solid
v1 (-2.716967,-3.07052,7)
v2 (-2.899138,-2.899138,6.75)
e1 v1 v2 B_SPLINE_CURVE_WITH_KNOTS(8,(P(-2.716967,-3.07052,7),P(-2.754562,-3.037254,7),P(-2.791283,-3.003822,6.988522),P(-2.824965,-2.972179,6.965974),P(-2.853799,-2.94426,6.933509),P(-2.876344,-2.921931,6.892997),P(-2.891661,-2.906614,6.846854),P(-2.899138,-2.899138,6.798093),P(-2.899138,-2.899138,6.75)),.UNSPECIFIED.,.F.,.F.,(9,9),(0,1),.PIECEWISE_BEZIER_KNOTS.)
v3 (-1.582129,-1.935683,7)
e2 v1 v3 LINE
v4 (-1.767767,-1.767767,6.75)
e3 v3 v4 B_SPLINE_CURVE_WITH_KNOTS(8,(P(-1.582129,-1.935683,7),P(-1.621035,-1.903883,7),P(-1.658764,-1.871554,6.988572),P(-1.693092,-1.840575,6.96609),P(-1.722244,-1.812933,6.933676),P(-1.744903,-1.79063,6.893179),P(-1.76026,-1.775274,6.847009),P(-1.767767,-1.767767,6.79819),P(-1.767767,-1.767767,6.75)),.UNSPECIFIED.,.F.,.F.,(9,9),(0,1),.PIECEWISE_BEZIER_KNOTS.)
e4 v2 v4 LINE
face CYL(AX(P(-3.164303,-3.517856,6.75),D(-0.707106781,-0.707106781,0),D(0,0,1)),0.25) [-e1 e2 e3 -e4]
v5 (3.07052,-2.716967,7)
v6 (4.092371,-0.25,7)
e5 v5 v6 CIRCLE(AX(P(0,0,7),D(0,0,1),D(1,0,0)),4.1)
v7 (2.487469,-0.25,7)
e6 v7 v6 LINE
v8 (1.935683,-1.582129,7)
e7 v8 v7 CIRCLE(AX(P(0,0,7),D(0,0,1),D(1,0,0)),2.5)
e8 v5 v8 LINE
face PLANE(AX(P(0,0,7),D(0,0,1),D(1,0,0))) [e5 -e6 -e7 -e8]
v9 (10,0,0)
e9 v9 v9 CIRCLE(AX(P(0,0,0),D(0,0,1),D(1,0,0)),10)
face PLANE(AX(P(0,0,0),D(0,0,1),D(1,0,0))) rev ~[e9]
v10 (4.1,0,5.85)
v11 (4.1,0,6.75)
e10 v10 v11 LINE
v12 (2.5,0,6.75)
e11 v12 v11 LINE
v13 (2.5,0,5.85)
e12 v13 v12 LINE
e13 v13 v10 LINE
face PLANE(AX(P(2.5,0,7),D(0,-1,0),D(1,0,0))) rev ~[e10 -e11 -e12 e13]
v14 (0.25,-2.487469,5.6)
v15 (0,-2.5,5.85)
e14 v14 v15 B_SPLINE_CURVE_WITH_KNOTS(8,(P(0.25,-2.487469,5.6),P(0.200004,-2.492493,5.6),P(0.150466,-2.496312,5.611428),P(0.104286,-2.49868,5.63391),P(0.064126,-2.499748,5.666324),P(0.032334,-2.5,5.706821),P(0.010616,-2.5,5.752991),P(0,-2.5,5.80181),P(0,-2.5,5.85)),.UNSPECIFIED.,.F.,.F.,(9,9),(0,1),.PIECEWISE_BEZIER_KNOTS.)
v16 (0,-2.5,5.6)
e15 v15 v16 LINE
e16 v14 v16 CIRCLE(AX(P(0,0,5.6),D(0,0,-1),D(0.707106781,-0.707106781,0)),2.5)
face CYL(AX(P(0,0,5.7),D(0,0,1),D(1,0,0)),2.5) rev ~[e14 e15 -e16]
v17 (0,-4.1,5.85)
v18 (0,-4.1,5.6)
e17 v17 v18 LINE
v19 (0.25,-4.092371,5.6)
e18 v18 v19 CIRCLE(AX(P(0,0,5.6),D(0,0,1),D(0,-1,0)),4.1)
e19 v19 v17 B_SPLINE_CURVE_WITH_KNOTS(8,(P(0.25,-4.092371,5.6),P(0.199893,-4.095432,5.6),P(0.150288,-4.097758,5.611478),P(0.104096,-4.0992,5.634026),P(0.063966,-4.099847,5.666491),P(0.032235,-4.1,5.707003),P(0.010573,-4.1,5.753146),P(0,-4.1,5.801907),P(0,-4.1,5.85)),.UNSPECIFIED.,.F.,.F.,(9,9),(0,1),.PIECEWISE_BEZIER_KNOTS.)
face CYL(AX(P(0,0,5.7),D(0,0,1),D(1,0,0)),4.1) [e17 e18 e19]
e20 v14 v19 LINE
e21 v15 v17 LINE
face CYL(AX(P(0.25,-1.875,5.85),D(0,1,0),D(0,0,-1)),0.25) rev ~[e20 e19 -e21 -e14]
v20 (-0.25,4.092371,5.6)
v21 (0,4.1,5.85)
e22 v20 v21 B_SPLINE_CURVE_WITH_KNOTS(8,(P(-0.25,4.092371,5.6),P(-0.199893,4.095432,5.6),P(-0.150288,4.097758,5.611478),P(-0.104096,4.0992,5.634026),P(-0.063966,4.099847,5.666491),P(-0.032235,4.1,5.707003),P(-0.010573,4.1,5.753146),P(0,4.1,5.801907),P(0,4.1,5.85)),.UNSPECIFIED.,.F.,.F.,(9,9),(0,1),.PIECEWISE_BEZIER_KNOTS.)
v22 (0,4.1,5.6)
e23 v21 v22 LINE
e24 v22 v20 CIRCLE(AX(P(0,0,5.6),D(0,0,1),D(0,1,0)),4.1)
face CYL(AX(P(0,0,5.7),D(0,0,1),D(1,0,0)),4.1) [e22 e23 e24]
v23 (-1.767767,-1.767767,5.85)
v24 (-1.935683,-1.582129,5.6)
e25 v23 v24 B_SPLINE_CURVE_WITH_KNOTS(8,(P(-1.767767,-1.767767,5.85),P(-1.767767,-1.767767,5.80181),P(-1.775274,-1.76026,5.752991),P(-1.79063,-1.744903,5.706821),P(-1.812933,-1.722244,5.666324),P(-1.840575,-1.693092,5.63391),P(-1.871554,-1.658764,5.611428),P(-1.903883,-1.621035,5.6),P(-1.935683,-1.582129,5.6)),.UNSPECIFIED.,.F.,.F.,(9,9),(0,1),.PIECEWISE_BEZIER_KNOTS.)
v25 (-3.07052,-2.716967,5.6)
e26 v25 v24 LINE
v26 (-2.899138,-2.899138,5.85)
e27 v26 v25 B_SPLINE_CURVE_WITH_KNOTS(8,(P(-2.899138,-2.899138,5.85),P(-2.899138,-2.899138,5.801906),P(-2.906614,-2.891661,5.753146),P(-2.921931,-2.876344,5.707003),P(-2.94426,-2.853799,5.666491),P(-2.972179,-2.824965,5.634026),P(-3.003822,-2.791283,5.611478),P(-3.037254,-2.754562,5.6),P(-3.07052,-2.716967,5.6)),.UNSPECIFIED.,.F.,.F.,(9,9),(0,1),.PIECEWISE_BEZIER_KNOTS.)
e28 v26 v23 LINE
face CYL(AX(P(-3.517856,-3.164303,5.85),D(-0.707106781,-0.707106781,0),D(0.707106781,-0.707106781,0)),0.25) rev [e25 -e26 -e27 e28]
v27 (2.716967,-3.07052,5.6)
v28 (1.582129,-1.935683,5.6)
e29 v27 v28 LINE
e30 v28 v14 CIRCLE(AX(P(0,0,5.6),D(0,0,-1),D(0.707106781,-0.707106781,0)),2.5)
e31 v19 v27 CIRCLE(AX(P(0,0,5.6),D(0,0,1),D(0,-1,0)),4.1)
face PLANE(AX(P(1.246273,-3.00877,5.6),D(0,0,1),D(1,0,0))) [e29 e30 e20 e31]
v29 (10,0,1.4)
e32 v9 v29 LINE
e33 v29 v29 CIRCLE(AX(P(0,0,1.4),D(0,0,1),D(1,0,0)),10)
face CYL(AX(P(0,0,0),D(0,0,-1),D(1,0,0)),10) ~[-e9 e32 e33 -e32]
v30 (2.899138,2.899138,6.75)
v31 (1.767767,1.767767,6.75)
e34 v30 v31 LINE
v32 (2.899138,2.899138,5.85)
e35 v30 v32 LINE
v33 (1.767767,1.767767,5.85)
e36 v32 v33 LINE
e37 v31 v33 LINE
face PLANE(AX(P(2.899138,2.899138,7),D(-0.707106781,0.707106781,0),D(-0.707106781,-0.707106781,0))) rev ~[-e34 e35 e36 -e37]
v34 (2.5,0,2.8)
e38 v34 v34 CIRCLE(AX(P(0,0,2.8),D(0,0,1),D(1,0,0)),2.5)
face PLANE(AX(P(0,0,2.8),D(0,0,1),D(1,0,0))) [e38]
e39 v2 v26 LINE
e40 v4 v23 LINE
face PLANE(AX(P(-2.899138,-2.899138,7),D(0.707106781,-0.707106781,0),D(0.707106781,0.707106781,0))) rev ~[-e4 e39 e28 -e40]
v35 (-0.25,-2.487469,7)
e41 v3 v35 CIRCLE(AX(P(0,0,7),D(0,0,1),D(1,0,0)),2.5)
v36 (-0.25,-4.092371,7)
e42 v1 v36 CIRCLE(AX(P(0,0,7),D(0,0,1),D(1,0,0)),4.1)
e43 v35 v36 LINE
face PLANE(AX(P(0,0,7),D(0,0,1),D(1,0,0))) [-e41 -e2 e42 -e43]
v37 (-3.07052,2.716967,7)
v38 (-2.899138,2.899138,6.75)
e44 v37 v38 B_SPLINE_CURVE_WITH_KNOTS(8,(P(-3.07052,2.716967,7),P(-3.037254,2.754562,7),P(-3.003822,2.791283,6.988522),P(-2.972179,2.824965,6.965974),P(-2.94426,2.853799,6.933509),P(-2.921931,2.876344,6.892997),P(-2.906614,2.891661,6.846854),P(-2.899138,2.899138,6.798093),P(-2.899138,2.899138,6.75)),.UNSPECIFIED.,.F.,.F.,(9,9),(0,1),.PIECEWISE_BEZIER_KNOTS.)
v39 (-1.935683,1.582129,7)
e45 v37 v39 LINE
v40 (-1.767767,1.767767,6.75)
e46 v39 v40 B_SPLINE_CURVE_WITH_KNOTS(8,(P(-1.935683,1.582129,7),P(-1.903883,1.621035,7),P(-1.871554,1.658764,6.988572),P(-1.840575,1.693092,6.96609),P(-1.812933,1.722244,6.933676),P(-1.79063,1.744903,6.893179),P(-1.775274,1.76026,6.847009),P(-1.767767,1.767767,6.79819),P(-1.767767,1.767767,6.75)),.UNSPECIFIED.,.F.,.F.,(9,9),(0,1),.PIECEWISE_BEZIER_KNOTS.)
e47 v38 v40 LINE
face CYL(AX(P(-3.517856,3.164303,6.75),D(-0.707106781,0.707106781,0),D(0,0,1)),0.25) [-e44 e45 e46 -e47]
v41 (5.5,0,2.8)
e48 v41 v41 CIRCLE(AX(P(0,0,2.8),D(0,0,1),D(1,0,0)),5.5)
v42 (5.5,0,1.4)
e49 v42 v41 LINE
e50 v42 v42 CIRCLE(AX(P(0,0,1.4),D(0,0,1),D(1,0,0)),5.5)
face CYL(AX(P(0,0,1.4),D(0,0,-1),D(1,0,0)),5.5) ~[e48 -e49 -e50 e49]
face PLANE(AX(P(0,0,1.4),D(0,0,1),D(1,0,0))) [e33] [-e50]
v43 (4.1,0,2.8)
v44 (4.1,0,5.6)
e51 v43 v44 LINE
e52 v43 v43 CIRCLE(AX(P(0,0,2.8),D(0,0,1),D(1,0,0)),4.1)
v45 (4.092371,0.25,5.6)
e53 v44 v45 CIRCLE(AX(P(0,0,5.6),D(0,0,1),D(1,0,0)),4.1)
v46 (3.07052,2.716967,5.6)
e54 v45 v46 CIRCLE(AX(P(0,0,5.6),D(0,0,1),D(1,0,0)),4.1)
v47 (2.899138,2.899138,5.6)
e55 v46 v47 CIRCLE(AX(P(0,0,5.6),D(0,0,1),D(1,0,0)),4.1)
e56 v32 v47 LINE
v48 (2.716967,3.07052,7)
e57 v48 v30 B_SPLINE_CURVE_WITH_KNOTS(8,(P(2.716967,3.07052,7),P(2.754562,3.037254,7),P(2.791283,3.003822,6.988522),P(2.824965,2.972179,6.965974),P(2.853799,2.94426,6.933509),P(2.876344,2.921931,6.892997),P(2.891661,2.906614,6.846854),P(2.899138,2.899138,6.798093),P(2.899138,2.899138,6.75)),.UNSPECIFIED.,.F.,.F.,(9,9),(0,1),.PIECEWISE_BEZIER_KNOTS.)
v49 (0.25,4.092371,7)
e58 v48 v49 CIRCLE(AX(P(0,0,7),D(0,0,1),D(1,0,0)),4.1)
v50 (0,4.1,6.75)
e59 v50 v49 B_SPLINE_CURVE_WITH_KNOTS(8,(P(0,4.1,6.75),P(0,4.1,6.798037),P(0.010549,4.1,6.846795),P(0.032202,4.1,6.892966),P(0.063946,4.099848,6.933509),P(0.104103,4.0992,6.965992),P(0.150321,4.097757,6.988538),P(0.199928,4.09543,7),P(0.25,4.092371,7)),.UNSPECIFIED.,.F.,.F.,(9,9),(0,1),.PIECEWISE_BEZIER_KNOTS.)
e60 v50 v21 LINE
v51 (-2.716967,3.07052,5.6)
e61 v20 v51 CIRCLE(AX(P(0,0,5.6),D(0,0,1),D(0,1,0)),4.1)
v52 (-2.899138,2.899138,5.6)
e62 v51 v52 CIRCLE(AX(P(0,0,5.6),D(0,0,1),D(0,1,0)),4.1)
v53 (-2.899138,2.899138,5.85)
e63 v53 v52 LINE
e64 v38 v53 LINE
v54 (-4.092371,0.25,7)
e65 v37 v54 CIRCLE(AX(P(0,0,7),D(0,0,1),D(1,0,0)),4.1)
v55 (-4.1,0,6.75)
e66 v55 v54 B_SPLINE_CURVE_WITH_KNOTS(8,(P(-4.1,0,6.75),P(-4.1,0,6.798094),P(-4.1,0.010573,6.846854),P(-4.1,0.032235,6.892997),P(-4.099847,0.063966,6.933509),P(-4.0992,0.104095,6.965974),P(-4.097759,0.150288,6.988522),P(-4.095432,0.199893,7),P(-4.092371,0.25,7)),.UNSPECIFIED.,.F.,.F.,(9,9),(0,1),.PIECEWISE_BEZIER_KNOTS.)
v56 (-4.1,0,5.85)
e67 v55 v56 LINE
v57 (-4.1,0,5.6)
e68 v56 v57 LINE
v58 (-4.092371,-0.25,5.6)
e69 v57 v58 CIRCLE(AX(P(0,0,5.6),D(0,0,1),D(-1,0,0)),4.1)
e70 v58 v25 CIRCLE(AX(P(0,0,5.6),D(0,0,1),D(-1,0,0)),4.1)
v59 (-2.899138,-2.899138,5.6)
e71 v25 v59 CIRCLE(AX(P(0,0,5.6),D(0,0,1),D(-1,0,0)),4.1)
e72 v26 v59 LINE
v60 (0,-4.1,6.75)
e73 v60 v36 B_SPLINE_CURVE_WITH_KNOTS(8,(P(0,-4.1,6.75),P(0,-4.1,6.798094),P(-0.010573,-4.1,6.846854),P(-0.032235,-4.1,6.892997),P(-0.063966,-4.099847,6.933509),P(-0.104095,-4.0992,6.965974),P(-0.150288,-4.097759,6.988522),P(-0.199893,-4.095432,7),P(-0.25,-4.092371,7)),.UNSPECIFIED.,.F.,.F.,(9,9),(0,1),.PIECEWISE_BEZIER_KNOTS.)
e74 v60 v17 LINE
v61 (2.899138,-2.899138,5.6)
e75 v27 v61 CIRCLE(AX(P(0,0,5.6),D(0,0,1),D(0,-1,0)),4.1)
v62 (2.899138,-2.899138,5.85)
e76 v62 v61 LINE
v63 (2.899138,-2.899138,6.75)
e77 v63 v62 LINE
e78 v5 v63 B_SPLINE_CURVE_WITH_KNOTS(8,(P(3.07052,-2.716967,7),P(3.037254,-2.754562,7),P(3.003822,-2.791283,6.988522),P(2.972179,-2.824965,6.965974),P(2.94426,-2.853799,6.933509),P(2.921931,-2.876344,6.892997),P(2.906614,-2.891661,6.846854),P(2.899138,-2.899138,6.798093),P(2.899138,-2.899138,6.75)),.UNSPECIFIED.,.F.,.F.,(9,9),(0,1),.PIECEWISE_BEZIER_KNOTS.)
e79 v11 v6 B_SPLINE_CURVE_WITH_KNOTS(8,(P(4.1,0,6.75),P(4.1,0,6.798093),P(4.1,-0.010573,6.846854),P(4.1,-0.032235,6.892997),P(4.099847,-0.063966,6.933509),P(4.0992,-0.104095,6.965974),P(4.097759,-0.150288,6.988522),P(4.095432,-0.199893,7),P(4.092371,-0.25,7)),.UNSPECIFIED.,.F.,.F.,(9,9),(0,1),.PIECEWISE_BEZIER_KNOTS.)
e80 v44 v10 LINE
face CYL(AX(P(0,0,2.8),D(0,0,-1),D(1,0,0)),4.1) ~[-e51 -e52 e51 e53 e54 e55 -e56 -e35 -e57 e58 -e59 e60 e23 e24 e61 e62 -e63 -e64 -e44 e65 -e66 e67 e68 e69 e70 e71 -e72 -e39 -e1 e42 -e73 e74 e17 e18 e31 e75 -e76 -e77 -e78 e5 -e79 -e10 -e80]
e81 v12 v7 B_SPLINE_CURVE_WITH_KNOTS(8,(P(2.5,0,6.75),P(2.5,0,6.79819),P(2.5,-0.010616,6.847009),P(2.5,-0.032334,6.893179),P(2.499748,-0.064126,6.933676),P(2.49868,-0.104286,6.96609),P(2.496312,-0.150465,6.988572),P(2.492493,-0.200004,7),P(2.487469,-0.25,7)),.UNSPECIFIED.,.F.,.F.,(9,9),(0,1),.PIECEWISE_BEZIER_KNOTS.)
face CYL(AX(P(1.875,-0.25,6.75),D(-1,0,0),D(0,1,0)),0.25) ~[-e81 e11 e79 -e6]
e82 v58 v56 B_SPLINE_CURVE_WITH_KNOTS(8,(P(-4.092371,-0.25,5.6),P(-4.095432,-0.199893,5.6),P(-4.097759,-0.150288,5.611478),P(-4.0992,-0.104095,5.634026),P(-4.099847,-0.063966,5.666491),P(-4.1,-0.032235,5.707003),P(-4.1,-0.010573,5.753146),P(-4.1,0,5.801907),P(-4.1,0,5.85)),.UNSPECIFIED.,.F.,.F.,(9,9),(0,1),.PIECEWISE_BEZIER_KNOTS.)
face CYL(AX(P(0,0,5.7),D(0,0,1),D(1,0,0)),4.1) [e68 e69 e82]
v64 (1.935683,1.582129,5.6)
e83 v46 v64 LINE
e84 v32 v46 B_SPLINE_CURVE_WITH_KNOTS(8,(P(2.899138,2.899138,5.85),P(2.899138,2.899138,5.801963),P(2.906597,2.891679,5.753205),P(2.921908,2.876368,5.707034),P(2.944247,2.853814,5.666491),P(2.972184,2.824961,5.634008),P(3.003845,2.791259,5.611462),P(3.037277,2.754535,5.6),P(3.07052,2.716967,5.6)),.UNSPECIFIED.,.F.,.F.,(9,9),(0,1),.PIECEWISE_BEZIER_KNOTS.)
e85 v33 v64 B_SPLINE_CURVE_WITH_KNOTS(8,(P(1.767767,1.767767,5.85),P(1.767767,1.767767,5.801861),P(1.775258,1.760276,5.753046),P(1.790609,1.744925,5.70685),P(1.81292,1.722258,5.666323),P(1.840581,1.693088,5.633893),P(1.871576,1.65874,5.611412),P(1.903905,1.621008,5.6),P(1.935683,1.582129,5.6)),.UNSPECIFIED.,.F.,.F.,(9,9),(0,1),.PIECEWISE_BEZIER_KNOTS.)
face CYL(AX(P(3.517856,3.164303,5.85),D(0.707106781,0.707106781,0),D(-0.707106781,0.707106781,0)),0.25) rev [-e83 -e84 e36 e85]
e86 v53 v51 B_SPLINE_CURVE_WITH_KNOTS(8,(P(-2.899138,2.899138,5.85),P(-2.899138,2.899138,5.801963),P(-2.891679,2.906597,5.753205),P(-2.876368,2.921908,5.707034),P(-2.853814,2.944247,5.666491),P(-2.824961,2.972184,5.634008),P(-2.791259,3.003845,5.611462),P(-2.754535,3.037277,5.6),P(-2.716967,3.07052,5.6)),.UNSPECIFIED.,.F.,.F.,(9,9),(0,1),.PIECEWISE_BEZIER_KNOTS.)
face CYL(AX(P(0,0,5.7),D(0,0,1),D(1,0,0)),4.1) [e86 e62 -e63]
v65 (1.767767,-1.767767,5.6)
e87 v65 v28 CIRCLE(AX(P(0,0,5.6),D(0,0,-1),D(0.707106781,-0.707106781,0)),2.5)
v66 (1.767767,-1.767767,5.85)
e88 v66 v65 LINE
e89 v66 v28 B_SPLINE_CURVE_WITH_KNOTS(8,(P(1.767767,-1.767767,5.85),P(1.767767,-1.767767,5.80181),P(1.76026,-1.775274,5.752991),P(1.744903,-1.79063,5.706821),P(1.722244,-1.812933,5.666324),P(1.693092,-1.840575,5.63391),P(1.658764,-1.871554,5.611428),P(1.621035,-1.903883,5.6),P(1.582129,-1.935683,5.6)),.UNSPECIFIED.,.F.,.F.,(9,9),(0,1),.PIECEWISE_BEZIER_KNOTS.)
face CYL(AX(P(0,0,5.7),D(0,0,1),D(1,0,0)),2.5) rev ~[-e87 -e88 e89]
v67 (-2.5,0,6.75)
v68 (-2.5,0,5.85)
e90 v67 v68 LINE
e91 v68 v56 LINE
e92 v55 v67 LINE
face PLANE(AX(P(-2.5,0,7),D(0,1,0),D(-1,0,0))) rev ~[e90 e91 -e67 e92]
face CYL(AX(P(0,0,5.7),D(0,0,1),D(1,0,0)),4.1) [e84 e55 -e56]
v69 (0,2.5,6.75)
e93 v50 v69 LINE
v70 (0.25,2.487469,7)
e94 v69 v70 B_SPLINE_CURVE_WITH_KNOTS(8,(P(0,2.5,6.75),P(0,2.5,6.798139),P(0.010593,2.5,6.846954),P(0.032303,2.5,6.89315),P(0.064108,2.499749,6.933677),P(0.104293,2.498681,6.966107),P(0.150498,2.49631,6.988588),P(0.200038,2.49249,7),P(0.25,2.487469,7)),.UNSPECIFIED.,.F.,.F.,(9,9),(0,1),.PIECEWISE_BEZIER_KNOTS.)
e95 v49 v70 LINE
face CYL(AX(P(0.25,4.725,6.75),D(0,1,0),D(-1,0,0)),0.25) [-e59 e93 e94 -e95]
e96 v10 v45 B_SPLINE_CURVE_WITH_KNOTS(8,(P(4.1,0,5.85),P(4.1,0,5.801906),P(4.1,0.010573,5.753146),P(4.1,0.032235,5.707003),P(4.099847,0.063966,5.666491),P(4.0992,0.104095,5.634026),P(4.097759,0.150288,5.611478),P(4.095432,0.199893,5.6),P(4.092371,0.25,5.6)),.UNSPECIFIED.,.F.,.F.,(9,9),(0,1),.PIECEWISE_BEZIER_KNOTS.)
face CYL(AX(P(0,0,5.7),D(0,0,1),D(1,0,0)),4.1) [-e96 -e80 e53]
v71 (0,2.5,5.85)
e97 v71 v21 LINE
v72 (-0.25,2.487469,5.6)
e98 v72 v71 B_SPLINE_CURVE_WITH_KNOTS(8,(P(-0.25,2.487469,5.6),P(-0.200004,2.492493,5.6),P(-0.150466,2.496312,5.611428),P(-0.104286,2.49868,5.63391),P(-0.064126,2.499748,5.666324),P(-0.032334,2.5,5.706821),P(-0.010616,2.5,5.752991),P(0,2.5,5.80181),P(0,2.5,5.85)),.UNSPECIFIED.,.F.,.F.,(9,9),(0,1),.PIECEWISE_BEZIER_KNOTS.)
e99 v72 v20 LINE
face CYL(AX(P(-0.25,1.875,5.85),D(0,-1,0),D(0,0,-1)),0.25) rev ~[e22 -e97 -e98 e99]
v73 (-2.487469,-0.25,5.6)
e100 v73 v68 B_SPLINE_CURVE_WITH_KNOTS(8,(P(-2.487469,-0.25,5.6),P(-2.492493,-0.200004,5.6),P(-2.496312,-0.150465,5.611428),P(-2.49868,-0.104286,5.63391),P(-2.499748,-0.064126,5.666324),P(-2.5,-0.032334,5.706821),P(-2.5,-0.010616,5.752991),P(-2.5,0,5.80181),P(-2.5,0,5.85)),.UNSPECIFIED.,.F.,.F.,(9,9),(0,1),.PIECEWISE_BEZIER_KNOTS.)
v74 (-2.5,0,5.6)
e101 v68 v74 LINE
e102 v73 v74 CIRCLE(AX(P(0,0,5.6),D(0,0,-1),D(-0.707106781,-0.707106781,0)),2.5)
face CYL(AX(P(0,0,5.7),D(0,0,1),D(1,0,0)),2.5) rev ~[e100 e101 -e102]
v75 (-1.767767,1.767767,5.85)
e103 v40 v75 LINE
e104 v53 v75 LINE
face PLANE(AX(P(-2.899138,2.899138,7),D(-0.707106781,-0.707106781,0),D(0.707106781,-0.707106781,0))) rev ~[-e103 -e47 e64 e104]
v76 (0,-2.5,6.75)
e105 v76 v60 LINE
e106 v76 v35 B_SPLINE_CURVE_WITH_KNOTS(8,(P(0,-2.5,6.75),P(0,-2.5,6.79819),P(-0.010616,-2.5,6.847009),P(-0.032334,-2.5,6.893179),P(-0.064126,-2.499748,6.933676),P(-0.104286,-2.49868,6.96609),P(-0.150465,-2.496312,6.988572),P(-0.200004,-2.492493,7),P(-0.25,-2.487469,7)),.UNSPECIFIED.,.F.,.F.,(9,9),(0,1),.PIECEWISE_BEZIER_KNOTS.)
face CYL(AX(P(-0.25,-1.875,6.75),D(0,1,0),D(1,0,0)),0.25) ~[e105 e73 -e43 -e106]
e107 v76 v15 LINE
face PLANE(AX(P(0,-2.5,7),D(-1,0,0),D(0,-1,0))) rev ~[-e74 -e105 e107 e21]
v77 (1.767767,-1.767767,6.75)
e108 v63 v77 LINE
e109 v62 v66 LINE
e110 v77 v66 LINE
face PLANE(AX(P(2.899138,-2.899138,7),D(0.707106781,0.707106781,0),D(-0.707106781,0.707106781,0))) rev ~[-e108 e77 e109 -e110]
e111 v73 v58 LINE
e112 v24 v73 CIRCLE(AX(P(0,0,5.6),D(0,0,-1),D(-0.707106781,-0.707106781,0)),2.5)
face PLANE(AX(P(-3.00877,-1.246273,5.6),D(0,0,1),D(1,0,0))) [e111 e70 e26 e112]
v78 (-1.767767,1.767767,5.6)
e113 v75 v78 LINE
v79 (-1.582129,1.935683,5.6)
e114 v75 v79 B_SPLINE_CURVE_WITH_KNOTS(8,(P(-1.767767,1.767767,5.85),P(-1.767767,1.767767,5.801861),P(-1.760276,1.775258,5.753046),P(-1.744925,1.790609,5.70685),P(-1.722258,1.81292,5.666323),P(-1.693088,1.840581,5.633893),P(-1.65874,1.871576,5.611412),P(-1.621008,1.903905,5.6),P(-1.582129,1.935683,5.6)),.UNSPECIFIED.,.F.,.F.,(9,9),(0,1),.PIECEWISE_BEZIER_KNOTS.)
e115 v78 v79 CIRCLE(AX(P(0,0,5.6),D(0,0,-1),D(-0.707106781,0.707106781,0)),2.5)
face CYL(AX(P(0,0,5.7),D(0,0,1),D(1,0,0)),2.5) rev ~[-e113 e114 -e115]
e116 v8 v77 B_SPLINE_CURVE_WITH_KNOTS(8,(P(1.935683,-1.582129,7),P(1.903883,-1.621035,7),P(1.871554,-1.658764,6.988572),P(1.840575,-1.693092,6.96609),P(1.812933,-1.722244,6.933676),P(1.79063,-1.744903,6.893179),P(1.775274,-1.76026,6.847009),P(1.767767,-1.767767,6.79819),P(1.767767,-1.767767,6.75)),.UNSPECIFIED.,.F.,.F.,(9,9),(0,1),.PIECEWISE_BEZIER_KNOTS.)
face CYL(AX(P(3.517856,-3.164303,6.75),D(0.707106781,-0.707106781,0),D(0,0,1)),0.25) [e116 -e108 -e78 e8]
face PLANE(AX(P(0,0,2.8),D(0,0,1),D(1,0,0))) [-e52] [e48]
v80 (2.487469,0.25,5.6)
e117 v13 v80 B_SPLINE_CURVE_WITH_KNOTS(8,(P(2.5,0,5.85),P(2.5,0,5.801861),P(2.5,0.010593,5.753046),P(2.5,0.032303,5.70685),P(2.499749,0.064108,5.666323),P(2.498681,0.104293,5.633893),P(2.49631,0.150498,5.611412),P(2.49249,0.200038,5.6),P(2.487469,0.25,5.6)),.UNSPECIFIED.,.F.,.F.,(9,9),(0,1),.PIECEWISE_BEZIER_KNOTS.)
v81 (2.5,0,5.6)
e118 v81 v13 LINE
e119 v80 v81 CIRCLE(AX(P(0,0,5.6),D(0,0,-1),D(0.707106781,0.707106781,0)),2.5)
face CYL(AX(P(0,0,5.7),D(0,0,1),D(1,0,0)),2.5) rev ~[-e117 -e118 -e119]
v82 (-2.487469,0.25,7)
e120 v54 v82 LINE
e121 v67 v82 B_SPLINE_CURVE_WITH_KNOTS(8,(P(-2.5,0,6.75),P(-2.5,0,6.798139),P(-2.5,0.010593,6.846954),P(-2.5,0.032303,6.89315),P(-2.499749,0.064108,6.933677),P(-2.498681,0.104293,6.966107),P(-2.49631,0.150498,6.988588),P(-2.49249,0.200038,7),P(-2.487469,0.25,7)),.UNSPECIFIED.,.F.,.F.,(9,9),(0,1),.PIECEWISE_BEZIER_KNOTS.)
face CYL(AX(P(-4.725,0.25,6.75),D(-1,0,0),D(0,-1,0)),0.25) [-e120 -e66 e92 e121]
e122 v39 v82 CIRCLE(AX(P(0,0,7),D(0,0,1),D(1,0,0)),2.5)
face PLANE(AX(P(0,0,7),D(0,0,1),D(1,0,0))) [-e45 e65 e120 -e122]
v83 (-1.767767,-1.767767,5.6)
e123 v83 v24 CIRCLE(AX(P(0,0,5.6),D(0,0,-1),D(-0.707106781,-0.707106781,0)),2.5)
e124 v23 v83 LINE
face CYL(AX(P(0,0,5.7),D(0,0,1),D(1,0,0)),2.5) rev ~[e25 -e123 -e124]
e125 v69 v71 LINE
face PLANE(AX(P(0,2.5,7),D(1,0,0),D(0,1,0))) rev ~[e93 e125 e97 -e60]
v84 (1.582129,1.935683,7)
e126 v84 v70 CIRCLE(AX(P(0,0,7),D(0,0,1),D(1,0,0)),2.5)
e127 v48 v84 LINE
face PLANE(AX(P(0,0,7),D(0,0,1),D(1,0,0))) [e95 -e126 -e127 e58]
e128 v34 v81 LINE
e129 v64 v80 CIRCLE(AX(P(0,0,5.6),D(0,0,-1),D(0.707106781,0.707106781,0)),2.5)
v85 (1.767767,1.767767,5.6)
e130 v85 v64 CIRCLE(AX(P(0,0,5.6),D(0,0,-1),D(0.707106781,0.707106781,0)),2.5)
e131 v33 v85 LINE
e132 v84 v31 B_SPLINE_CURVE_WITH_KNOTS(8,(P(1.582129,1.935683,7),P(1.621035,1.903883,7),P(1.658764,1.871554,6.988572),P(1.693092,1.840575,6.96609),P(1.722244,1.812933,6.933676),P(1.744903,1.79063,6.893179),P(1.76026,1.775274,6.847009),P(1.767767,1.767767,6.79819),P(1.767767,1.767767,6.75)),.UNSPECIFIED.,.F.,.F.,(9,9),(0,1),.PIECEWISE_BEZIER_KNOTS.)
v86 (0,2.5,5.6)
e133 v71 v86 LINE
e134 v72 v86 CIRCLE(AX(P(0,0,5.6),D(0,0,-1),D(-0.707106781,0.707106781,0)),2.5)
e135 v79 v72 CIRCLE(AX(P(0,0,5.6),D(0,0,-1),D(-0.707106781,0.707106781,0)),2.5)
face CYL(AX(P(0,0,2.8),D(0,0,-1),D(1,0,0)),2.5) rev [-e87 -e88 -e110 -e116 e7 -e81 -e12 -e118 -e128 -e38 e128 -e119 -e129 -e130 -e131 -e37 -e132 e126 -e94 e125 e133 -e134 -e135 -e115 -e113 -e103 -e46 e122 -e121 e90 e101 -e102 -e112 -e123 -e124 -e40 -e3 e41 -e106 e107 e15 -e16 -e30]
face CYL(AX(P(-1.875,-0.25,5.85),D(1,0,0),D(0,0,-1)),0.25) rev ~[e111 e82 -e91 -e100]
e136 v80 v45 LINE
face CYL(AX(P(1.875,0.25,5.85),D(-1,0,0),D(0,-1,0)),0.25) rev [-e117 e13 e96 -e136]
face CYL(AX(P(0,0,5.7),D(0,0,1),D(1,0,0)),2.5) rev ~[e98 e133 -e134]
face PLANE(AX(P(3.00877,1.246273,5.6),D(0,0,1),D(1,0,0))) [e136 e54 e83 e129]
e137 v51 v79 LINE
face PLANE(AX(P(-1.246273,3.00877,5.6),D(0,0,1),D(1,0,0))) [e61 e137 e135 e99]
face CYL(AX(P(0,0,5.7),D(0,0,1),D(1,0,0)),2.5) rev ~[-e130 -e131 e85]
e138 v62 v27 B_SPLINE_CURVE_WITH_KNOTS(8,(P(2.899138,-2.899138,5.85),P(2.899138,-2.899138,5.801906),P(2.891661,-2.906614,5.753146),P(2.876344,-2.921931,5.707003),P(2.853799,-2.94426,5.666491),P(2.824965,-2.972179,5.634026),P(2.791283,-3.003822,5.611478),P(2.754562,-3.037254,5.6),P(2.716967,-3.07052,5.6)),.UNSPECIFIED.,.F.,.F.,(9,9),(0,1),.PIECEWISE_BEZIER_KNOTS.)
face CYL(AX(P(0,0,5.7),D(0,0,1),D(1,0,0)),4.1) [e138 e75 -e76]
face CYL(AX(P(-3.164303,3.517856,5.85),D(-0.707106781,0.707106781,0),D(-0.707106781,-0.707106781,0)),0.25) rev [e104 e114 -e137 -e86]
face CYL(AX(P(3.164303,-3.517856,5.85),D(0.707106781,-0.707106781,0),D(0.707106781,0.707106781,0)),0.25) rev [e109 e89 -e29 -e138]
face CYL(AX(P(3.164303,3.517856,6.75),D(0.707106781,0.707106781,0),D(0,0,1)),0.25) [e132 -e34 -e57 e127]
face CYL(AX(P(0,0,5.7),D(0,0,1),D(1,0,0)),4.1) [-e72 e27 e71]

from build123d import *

# Parameters (mm, degrees)
F0_R         = 10
F1_DEPTH     = 1.4
F2_R         = 5.5
F3_DEPTH     = 1.4
F4_R         = 4.1
F4_R_2       = 2.5
F5_DEPTH     = 4.2
F7_DEPTH     = 1.4
F8_T4_DEPTH  = 2.85
F8_S5_R      = 4.1
F8_T6_DEPTH  = 3
F8_S7_R      = 2.5
F8_T8_DEPTH  = 3
F8_T12_DEPTH = 2.85
F8_S13_R     = 4.1
F8_T14_DEPTH = 3
F8_S15_R     = 2.5
F8_T16_DEPTH = 3
F8_T20_DEPTH = 2.85
F8_S21_R     = 4.1
F8_T22_DEPTH = 3
F8_S23_R     = 2.5
F8_T24_DEPTH = 3
F8_T28_DEPTH = 2.85
F8_S29_R     = 4.1
F8_T30_DEPTH = 3
F8_S31_R     = 2.5
F8_T32_DEPTH = 3
F8_T36_DEPTH = 2.85
F8_S37_R     = 4.1
F8_T38_DEPTH = 3
F8_S39_R     = 2.5
F8_T40_DEPTH = 3
F8_T44_DEPTH = 2.85
F8_S45_R     = 4.1
F8_T46_DEPTH = 3
F8_S47_R     = 2.5
F8_T48_DEPTH = 3
F8_T52_DEPTH = 2.85
F8_S53_R     = 4.1
F8_T54_DEPTH = 3
F8_S55_R     = 2.5
F8_T56_DEPTH = 3
F8_T60_DEPTH = 2.85
F8_S61_R     = 4.1
F8_T62_DEPTH = 3
F8_S63_R     = 2.5
F8_T64_DEPTH = 3
F8_T65_DEPTH = 2.85
F8_T67_DEPTH = 2.85
F8_T69_DEPTH = 2.85
F8_T71_DEPTH = 2.85
F8_T73_DEPTH = 2.85
F8_T75_DEPTH = 2.85
F8_T77_DEPTH = 2.85
F8_T79_DEPTH = 2.85


# Not quite as in the source:
# - a fillet or chamfer that OpenCascade refuses, or shapes differently, is made with other operations: its cross-section is extruded or revolved along the edge and cut away or added


with BuildPart() as f1:
    # F0 (on Top) → F1 (new body)
    with BuildSketch(Plane.XY):
        Circle(F0_R)
    extrude(amount=F1_DEPTH)

    # F2 (on face) → F3 (join)
    with BuildSketch(Plane.XY.offset(1.4)):
        Circle(F2_R)
    extrude(amount=F3_DEPTH)

    # F4 (on face) → F5 (join)
    with BuildSketch(Plane.XY.offset(2.8)):
        Circle(F4_R)
        Circle(F4_R_2, mode=Mode.SUBTRACT)
    extrude(amount=F5_DEPTH)

    # F6 (on face) → F7 (cut)
    with BuildSketch(Plane.XY.offset(7)):
        with BuildLine():
            Line((0, -2.5), (0, -4.1))
            ThreePointArc((0, -4.1), (1.5690020727, -3.7879060833), (2.8991378029, -2.8991378029))
            Line((2.8991378029, -2.8991378029), (1.767766953, -1.767766953))
            ThreePointArc((1.767766953, -1.767766953), (0.9567085809, -2.3096988313), (0, -2.5))
        make_face()
        with BuildLine():
            ThreePointArc((-4.1, 0), (-3.7879060833, -1.5690020727), (-2.8991378029, -2.8991378029))
            Line((-2.8991378029, -2.8991378029), (-1.767766953, -1.767766953))
            ThreePointArc((-1.767766953, -1.767766953), (-2.3096988313, -0.9567085809), (-2.5, 0))
            Line((-2.5, 0), (-4.1, 0))
        make_face()
        with BuildLine():
            Line((2.5, 0), (4.1, 0))
            ThreePointArc((4.1, 0), (3.7879060833, 1.5690020727), (2.8991378029, 2.8991378029))
            Line((2.8991378029, 2.8991378029), (1.767766953, 1.767766953))
            ThreePointArc((1.767766953, 1.767766953), (2.3096988313, 0.9567085809), (2.5, 0))
        make_face()
        with BuildLine():
            ThreePointArc((-1.767766953, 1.767766953), (-0.9567085809, 2.3096988313), (0, 2.5))
            Line((0, 2.5), (0, 4.1))
            ThreePointArc((0, 4.1), (-1.5690020727, 3.7879060833), (-2.8991378029, 2.8991378029))
            Line((-2.8991378029, 2.8991378029), (-1.767766953, 1.767766953))
        make_face()
    extrude(amount=-F7_DEPTH, mode=Mode.SUBTRACT)

    # F8: fillet of radius 0.25 on 16 edges, made by hand


with BuildPart() as f8_tool2:
    # F8_s3 → F8_t4 (new body)
    with BuildSketch(Plane.YZ.offset(-1.875)):
        with BuildLine():
            ThreePointArc((-0.25, 5.6), (-0.0732233047, 5.6732233047), (0, 5.85))
            Line((0, 5.85), (0, 5.6))
            Line((0, 5.6), (-0.25, 5.6))
        make_face()
    extrude(amount=-F8_T4_DEPTH)

    # F8_s5 → F8_t6 (intersect, symmetric)
    with BuildSketch(Plane.XY.offset(5.7)):
        Circle(F8_S5_R)
    extrude(amount=F8_T6_DEPTH, both=True, mode=Mode.INTERSECT)

    # F8_s7 → F8_t8 (cut, symmetric)
    with BuildSketch(Plane.XY.offset(5.7)):
        Circle(F8_S7_R)
    extrude(amount=F8_T8_DEPTH, both=True, mode=Mode.SUBTRACT)


with BuildPart() as f1_1:
    add(f1.part)

    # F8_t1: union F8_tool2
    add(f8_tool2.part)


with BuildPart() as f8_tool10:
    # F8_s11 → F8_t12 (new body)
    with BuildSketch(Plane.XZ.offset(-1.875)):
        with BuildLine():
            ThreePointArc((-0.25, 5.6), (-0.0732233047, 5.6732233047), (0, 5.85))
            Line((0, 5.85), (0, 5.6))
            Line((0, 5.6), (-0.25, 5.6))
        make_face()
    extrude(amount=-F8_T12_DEPTH)

    # F8_s13 → F8_t14 (intersect, symmetric)
    with BuildSketch(Plane.XY.offset(5.7)):
        Circle(F8_S13_R)
    extrude(amount=F8_T14_DEPTH, both=True, mode=Mode.INTERSECT)

    # F8_s15 → F8_t16 (cut, symmetric)
    with BuildSketch(Plane.XY.offset(5.7)):
        Circle(F8_S15_R)
    extrude(amount=F8_T16_DEPTH, both=True, mode=Mode.SUBTRACT)


with BuildPart() as f1_2:
    add(f1_1.part)

    # F8_t9: union F8_tool10
    add(f8_tool10.part)


with BuildPart() as f8_tool18:
    # F8_s19 → F8_t20 (new body)
    with BuildSketch(Plane(origin=(3.3410795411, -3.3410795411, 0), x_dir=(0, 0, 1), z_dir=(-0.7071067812, 0.7071067812, 0))):
        with BuildLine():
            ThreePointArc((5.85, 0), (5.6732233047, -0.0732233047), (5.6, -0.25))
            Line((5.6, -0.25), (5.6, 0))
            Line((5.6, 0), (5.85, 0))
        make_face()
    extrude(amount=F8_T20_DEPTH)

    # F8_s21 → F8_t22 (intersect, symmetric)
    with BuildSketch(Plane.XY.offset(5.7)):
        Circle(F8_S21_R)
    extrude(amount=F8_T22_DEPTH, both=True, mode=Mode.INTERSECT)

    # F8_s23 → F8_t24 (cut, symmetric)
    with BuildSketch(Plane.XY.offset(5.7)):
        Circle(F8_S23_R)
    extrude(amount=F8_T24_DEPTH, both=True, mode=Mode.SUBTRACT)


with BuildPart() as f1_3:
    add(f1_2.part)

    # F8_t17: union F8_tool18
    add(f8_tool18.part)


with BuildPart() as f8_tool26:
    # F8_s27 → F8_t28 (new body)
    with BuildSketch(Plane.YZ.offset(1.875)):
        with BuildLine():
            ThreePointArc((0, 5.85), (0.0732233047, 5.6732233047), (0.25, 5.6))
            Line((0.25, 5.6), (0, 5.6))
            Line((0, 5.6), (0, 5.85))
        make_face()
    extrude(amount=F8_T28_DEPTH)

    # F8_s29 → F8_t30 (intersect, symmetric)
    with BuildSketch(Plane.XY.offset(5.7)):
        Circle(F8_S29_R)
    extrude(amount=F8_T30_DEPTH, both=True, mode=Mode.INTERSECT)

    # F8_s31 → F8_t32 (cut, symmetric)
    with BuildSketch(Plane.XY.offset(5.7)):
        Circle(F8_S31_R)
    extrude(amount=F8_T32_DEPTH, both=True, mode=Mode.SUBTRACT)


with BuildPart() as f1_4:
    add(f1_3.part)

    # F8_t25: union F8_tool26
    add(f8_tool26.part)


with BuildPart() as f8_tool34:
    # F8_s35 → F8_t36 (new body)
    with BuildSketch(Plane(origin=(-3.3410795411, -3.3410795411, 0), x_dir=(0, 0, 1), z_dir=(0.7071067812, 0.7071067812, 0))):
        with BuildLine():
            ThreePointArc((5.85, 0), (5.6732233047, -0.0732233047), (5.6, -0.25))
            Line((5.6, -0.25), (5.6, 0))
            Line((5.6, 0), (5.85, 0))
        make_face()
    extrude(amount=F8_T36_DEPTH)

    # F8_s37 → F8_t38 (intersect, symmetric)
    with BuildSketch(Plane.XY.offset(5.7)):
        Circle(F8_S37_R)
    extrude(amount=F8_T38_DEPTH, both=True, mode=Mode.INTERSECT)

    # F8_s39 → F8_t40 (cut, symmetric)
    with BuildSketch(Plane.XY.offset(5.7)):
        Circle(F8_S39_R)
    extrude(amount=F8_T40_DEPTH, both=True, mode=Mode.SUBTRACT)


with BuildPart() as f1_5:
    add(f1_4.part)

    # F8_t33: union F8_tool34
    add(f8_tool34.part)


with BuildPart() as f8_tool42:
    # F8_s43 → F8_t44 (new body)
    with BuildSketch(Plane(origin=(-3.3410795411, 3.3410795411, 0), x_dir=(0, 0, 1), z_dir=(0.7071067812, -0.7071067812, 0))):
        with BuildLine():
            ThreePointArc((5.85, 0), (5.6732233047, -0.0732233047), (5.6, -0.25))
            Line((5.6, -0.25), (5.6, 0))
            Line((5.6, 0), (5.85, 0))
        make_face()
    extrude(amount=F8_T44_DEPTH)

    # F8_s45 → F8_t46 (intersect, symmetric)
    with BuildSketch(Plane.XY.offset(5.7)):
        Circle(F8_S45_R)
    extrude(amount=F8_T46_DEPTH, both=True, mode=Mode.INTERSECT)

    # F8_s47 → F8_t48 (cut, symmetric)
    with BuildSketch(Plane.XY.offset(5.7)):
        Circle(F8_S47_R)
    extrude(amount=F8_T48_DEPTH, both=True, mode=Mode.SUBTRACT)


with BuildPart() as f1_6:
    add(f1_5.part)

    # F8_t41: union F8_tool42
    add(f8_tool42.part)


with BuildPart() as f8_tool50:
    # F8_s51 → F8_t52 (new body)
    with BuildSketch(Plane.XZ.offset(1.875)):
        with BuildLine():
            ThreePointArc((0.25, 5.6), (0.0732233047, 5.6732233047), (0, 5.85))
            Line((0, 5.85), (0, 5.6))
            Line((0, 5.6), (0.25, 5.6))
        make_face()
    extrude(amount=F8_T52_DEPTH)

    # F8_s53 → F8_t54 (intersect, symmetric)
    with BuildSketch(Plane.XY.offset(5.7)):
        Circle(F8_S53_R)
    extrude(amount=F8_T54_DEPTH, both=True, mode=Mode.INTERSECT)

    # F8_s55 → F8_t56 (cut, symmetric)
    with BuildSketch(Plane.XY.offset(5.7)):
        Circle(F8_S55_R)
    extrude(amount=F8_T56_DEPTH, both=True, mode=Mode.SUBTRACT)


with BuildPart() as f1_7:
    add(f1_6.part)

    # F8_t49: union F8_tool50
    add(f8_tool50.part)


with BuildPart() as f8_tool58:
    # F8_s59 → F8_t60 (new body)
    with BuildSketch(Plane(origin=(3.3410795411, 3.3410795411, 0), x_dir=(0, 0, 1), z_dir=(-0.7071067812, -0.7071067812, 0))):
        with BuildLine():
            ThreePointArc((5.85, 0), (5.6732233047, -0.0732233047), (5.6, -0.25))
            Line((5.6, -0.25), (5.6, 0))
            Line((5.6, 0), (5.85, 0))
        make_face()
    extrude(amount=F8_T60_DEPTH)

    # F8_s61 → F8_t62 (intersect, symmetric)
    with BuildSketch(Plane.XY.offset(5.7)):
        Circle(F8_S61_R)
    extrude(amount=F8_T62_DEPTH, both=True, mode=Mode.INTERSECT)

    # F8_s63 → F8_t64 (cut, symmetric)
    with BuildSketch(Plane.XY.offset(5.7)):
        Circle(F8_S63_R)
    extrude(amount=F8_T64_DEPTH, both=True, mode=Mode.SUBTRACT)


with BuildPart() as f1_8:
    add(f1_7.part)

    # F8_t57: union F8_tool58
    add(f8_tool58.part)

    # F8_s66 → F8_t65 (cut)
    with BuildSketch(Plane.YZ.offset(-4.725)):
        with BuildLine():
            ThreePointArc((0, 6.75), (0.0732233047, 6.9267766953), (0.25, 7))
            Line((0.25, 7), (0, 7))
            Line((0, 7), (0, 6.75))
        make_face()
    extrude(amount=F8_T65_DEPTH, mode=Mode.SUBTRACT)

    # F8_s68 → F8_t67 (cut)
    with BuildSketch(Plane(origin=(-3.3410795411, 3.3410795411, 0), x_dir=(0, 0, 1), z_dir=(0.7071067812, -0.7071067812, 0))):
        with BuildLine():
            ThreePointArc((7, 0.25), (6.9267766953, 0.0732233047), (6.75, 0))
            Line((6.75, 0), (7, 0))
            Line((7, 0), (7, 0.25))
        make_face()
    extrude(amount=F8_T67_DEPTH, mode=Mode.SUBTRACT)

    # F8_s70 → F8_t69 (cut)
    with BuildSketch(Plane.XZ.offset(1.875)):
        with BuildLine():
            ThreePointArc((0, 6.75), (-0.0732233047, 6.9267766953), (-0.25, 7))
            Line((-0.25, 7), (0, 7))
            Line((0, 7), (0, 6.75))
        make_face()
    extrude(amount=F8_T69_DEPTH, mode=Mode.SUBTRACT)

    # F8_s72 → F8_t71 (cut)
    with BuildSketch(Plane(origin=(-3.3410795411, -3.3410795411, 0), x_dir=(0, 0, 1), z_dir=(0.7071067812, 0.7071067812, 0))):
        with BuildLine():
            ThreePointArc((7, 0.25), (6.9267766953, 0.0732233047), (6.75, 0))
            Line((6.75, 0), (7, 0))
            Line((7, 0), (7, 0.25))
        make_face()
    extrude(amount=F8_T71_DEPTH, mode=Mode.SUBTRACT)

    # F8_s74 → F8_t73 (cut)
    with BuildSketch(Plane.YZ.offset(1.875)):
        with BuildLine():
            ThreePointArc((0, 6.75), (-0.0732233047, 6.9267766953), (-0.25, 7))
            Line((-0.25, 7), (0, 7))
            Line((0, 7), (0, 6.75))
        make_face()
    extrude(amount=F8_T73_DEPTH, mode=Mode.SUBTRACT)

    # F8_s76 → F8_t75 (cut)
    with BuildSketch(Plane(origin=(3.3410795411, -3.3410795411, 0), x_dir=(0, 0, 1), z_dir=(-0.7071067812, 0.7071067812, 0))):
        with BuildLine():
            ThreePointArc((7, 0.25), (6.9267766953, 0.0732233047), (6.75, 0))
            Line((6.75, 0), (7, 0))
            Line((7, 0), (7, 0.25))
        make_face()
    extrude(amount=F8_T75_DEPTH, mode=Mode.SUBTRACT)

    # F8_s78 → F8_t77 (cut)
    with BuildSketch(Plane.XZ.offset(-4.725)):
        with BuildLine():
            ThreePointArc((0, 6.75), (0.0732233047, 6.9267766953), (0.25, 7))
            Line((0.25, 7), (0, 7))
            Line((0, 7), (0, 6.75))
        make_face()
    extrude(amount=F8_T77_DEPTH, mode=Mode.SUBTRACT)

    # F8_s80 → F8_t79 (cut)
    with BuildSketch(Plane(origin=(3.3410795411, 3.3410795411, 0), x_dir=(0, 0, 1), z_dir=(-0.7071067812, -0.7071067812, 0))):
        with BuildLine():
            ThreePointArc((7, 0.25), (6.9267766953, 0.0732233047), (6.75, 0))
            Line((6.75, 0), (7, 0))
            Line((7, 0), (7, 0.25))
        make_face()
    extrude(amount=F8_T79_DEPTH, mode=Mode.SUBTRACT)


solid = f1_8.part
